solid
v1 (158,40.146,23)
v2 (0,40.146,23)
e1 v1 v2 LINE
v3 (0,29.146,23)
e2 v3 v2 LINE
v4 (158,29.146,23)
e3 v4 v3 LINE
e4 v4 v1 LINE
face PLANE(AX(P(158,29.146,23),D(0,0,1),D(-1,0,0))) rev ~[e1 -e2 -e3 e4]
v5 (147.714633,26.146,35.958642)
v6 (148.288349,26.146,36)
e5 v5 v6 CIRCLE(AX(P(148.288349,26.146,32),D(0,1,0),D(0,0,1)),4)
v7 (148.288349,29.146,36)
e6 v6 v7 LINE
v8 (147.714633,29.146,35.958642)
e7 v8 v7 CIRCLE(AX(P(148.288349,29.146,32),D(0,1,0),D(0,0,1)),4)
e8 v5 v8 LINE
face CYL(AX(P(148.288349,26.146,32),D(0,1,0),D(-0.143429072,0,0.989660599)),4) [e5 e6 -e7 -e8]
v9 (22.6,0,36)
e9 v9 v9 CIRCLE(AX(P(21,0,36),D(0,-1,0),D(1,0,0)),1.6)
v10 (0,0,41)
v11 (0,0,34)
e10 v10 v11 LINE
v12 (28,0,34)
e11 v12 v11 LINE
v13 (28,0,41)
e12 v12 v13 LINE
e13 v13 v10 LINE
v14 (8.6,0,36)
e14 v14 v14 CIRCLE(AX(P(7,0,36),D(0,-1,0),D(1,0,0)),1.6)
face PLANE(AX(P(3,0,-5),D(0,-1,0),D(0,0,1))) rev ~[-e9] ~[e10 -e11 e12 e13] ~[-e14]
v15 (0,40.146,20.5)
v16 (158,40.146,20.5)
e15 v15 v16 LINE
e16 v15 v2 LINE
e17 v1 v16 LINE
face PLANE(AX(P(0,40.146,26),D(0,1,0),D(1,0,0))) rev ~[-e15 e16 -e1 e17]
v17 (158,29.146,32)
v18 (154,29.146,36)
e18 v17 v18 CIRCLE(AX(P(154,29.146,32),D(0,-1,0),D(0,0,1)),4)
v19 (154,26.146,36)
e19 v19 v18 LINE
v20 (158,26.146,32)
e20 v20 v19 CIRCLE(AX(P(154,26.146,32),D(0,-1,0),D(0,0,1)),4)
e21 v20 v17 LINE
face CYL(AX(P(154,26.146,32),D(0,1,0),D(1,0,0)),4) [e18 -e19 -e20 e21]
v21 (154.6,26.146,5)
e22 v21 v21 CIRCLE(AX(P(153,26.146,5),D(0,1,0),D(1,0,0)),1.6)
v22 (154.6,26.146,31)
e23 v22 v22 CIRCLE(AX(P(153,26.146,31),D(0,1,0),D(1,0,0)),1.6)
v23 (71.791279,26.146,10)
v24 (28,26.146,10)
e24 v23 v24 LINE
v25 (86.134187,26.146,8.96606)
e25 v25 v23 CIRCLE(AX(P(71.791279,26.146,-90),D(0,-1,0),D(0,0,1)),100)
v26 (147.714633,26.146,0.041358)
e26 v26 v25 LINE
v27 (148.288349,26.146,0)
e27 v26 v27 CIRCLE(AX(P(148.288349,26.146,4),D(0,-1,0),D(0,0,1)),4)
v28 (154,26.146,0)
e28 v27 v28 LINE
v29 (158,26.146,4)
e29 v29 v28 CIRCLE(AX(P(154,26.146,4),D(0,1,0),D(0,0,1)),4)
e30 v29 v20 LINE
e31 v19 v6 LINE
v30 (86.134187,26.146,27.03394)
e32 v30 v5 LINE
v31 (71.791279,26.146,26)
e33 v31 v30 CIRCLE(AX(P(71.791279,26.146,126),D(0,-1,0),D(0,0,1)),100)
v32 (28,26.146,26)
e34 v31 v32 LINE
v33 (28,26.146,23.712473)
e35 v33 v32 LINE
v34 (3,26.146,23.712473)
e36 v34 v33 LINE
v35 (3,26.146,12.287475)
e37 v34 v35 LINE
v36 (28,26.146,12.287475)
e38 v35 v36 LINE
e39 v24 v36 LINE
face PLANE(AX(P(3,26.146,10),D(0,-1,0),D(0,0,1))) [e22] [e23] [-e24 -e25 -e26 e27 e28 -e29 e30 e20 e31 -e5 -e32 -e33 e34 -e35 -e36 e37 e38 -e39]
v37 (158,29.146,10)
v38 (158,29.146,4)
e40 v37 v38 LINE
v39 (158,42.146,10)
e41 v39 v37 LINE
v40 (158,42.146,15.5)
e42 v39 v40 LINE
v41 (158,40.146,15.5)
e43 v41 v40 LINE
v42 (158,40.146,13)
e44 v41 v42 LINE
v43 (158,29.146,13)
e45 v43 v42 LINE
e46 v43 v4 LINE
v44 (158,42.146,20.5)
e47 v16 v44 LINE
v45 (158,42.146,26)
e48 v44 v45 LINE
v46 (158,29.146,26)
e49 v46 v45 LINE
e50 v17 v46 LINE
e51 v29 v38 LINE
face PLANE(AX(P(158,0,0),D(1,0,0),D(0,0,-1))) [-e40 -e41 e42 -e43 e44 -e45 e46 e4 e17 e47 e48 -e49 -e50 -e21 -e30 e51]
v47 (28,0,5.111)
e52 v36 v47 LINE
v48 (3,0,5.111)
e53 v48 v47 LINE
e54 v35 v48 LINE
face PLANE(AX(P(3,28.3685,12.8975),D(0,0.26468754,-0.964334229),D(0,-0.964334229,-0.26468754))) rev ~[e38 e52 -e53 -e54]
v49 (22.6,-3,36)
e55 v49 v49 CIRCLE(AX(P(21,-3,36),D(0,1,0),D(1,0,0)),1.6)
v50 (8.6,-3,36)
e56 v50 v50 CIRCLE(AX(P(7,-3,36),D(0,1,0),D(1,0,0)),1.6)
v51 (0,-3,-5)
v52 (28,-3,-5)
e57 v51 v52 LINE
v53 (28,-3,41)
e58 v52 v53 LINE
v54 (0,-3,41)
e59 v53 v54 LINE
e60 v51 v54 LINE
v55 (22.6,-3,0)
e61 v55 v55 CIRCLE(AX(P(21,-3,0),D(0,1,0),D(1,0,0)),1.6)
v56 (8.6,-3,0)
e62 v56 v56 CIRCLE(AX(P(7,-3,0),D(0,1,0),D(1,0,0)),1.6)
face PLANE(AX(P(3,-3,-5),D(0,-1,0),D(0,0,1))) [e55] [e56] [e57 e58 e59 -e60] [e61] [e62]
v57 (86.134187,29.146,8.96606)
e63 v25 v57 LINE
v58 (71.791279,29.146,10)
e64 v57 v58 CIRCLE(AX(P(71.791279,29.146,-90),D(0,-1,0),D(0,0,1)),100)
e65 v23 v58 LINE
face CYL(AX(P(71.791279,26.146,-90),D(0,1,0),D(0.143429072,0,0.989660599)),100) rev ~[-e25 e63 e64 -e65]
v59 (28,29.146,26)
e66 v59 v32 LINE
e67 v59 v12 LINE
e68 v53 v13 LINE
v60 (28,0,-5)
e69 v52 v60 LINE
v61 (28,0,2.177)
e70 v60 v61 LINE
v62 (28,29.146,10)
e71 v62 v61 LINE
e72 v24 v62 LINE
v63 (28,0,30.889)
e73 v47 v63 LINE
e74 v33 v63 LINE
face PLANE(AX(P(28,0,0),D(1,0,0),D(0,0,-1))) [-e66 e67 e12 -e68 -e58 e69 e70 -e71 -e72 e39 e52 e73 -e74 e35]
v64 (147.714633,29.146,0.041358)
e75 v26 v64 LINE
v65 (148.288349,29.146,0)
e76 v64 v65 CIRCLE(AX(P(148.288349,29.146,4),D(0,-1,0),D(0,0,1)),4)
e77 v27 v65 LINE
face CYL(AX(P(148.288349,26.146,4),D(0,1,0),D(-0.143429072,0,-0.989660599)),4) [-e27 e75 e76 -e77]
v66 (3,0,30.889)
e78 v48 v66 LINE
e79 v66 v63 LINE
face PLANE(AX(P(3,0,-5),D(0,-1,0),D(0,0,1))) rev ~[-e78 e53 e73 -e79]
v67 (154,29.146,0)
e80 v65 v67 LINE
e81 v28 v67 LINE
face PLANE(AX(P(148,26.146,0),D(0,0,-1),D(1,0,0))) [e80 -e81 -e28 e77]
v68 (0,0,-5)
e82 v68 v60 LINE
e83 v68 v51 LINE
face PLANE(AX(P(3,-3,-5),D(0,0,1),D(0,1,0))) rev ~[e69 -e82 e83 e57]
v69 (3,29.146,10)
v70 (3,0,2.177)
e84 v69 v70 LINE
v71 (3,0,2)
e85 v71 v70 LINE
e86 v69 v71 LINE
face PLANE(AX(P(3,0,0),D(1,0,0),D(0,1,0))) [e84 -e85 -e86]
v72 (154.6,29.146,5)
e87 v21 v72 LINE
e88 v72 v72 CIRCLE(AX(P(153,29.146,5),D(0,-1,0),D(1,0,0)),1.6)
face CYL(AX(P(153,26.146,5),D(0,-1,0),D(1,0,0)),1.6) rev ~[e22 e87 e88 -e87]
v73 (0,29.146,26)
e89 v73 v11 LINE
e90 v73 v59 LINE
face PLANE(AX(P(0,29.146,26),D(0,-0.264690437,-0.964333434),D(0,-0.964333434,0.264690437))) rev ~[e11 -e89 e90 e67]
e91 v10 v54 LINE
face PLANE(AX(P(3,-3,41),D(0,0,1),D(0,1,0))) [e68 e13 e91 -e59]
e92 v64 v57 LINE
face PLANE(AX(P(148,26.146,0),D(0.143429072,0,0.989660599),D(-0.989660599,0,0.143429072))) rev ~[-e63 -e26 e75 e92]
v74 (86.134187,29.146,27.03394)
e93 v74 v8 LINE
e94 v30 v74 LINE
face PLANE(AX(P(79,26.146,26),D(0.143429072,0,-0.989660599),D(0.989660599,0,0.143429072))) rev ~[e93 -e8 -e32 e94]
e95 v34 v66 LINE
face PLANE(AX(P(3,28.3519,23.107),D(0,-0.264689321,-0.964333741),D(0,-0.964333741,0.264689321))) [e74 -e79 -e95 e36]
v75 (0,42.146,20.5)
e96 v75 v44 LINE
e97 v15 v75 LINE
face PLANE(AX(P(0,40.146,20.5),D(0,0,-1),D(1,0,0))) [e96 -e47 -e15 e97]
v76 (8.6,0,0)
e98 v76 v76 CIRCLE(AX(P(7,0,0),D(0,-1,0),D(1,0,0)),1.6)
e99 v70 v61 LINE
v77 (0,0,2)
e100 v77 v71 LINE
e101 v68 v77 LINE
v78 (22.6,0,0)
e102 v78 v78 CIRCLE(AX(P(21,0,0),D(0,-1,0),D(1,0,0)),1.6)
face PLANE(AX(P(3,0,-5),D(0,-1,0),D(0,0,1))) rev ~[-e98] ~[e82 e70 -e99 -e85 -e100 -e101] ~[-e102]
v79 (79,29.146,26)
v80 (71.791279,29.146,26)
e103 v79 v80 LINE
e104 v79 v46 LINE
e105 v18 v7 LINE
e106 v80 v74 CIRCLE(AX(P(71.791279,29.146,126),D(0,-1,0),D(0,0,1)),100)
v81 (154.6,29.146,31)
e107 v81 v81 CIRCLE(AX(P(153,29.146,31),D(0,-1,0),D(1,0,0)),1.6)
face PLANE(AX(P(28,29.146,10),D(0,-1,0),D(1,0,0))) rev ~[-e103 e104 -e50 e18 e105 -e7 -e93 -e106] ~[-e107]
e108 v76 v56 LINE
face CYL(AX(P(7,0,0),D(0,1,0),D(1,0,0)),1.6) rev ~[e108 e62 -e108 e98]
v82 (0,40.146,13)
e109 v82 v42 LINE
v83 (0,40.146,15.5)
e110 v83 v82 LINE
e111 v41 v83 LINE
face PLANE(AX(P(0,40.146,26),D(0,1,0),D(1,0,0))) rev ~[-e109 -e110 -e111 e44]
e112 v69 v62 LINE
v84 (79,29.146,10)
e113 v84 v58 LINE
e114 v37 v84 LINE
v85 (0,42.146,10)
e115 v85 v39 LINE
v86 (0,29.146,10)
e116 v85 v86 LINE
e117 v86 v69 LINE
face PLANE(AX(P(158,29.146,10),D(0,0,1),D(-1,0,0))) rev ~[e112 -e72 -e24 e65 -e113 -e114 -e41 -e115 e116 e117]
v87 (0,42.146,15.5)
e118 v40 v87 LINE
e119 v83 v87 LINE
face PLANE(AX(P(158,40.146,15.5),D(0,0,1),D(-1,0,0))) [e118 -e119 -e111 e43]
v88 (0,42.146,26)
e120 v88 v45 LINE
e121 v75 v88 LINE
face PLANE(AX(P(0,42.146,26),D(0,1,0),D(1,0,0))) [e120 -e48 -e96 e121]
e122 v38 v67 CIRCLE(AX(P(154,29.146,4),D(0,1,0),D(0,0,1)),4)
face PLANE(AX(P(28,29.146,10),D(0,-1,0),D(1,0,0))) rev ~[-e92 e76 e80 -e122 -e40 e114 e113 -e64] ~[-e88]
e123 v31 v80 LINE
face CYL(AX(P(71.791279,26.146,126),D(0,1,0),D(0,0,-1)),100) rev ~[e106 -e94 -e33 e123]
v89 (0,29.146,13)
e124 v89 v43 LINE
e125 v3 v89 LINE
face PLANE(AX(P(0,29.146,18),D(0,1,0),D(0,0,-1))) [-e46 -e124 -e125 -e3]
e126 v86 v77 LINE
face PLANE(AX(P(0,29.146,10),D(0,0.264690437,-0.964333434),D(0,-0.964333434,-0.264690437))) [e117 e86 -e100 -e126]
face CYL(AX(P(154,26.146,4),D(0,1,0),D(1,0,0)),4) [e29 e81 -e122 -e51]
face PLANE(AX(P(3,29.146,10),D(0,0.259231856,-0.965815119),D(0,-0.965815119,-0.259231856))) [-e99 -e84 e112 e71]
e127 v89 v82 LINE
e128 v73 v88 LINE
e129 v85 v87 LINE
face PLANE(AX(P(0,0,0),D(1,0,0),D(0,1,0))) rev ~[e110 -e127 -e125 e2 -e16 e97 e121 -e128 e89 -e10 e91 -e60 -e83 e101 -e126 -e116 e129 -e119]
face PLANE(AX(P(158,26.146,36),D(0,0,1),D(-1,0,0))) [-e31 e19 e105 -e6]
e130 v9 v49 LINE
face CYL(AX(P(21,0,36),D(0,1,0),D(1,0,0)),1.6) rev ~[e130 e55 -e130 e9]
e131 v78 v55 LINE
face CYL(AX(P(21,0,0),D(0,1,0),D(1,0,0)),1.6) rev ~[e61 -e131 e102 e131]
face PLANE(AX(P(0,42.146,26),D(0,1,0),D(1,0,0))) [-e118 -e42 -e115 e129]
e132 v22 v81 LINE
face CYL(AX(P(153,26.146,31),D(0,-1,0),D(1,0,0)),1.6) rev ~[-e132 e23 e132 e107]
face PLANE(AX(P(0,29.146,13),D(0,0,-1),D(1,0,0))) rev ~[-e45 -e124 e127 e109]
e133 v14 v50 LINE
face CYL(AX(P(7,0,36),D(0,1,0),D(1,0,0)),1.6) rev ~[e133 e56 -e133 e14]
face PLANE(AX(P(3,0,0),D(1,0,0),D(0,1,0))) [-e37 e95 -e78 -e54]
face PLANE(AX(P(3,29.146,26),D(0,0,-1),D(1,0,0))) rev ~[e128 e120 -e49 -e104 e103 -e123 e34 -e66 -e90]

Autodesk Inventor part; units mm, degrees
ref_plane "YZ Plane" through (0, 0, 0) normal (1, 0, 0) x (0, 1, 0)
ref_plane "XZ Plane" through (0, 0, 0) normal (0, 1, 0) x (-1, 0, 0)
ref_plane "XY Plane" through (0, 0, 0) normal (0, 0, 1) x (1, 0, 0)
sketch "Эскиз2" plane through (0, 0, 0) normal (1, 0, 0) x (0, 1, 0)
  line L0 (0, 0) -> (-3, 0)
  line L1 (-3, 0) -> (-3, 36)
  line L2 (-3, 36) -> (0, 36)
  line L3 (0, 36) -> (0, 0)
  line L4 (-3, 0) -> (0, 0)
  line L5 (0, 0) -> (0, -5)
  line L6 (0, -5) -> (-3, -5)
  line L7 (-3, -5) -> (-3, 0)
  line L8 (-3, 36) -> (0, 36)
  line L9 (0, 36) -> (0, 41)
  line L10 (0, 41) -> (-3, 41)
  line L11 (-3, 41) -> (-3, 36)
  line L12 (0, 0) -> (0, 36)
  line L13 (0, 36) -> (0, 34)
  line L14 (0, 0) -> (0, 2)
  line L15 (29.146, 18) -> (29.146, 26)
  line L16 (29.146, 26) -> (29.146, 10)
  line L17 (29.146, 10) -> (0, 2)
  line L18 (29.146, 26) -> (0, 34)
  point P0 (19.146, 0)
  dimension "d4" = 3
  dimension "d5" = 36
  dimension "d6" = 5
  dimension "d7" = 5
  dimension "d8" = 19.146
  dimension "d13" = 2
  dimension "d14" = 2
extrude "Выдавливание2" add sketch "Эскиз2" along normal blind 3
sketch "Эскиз3" plane through (3, 0, 0) normal (1, 0, 0) x (0, 0, -1)
  line L0 (5, -3) -> (5, 0) projected
  line L1 (5, 0) -> (-41, 0) projected
  line L2 (5, -3) -> (-41, -3)
  line L3 (-41, -3) -> (-41, 0)
  line L4 (-41, 0) -> (5, 0)
  line L5 (5, 0) -> (5, -3)
  point P0 (0, 0)
  point P1 (-34, 0)
extrude "Выдавливание3" add sketch "Эскиз3" along normal blind 25
sketch "Эскиз5" plane through (0, 0, 2) normal (0, 1, 0) x (1, 0, 0)
  line L0 (0, 7) -> (28, 7) projected
  line L1 (0, 7) -> (0, 2)
  line L2 (0, 7) -> (0, 0) projected
  line L3 (0, 2) -> (28, 2)
  line L4 (28, -39) -> (28, 7) projected
  line L5 (0, 7) -> (0, -39) projected
  line L6 (0, -39) -> (0, -34)
  line L7 (0, -34) -> (28, -34)
  line L8 (28, -34) -> (21, -34)
  line L9 (21, -34) -> (7, -34)
  line L10 (7, -34) -> (7, 2)
  circle A0 centre (7, -34) radius 1.6
  circle A1 centre (21, -34) radius 1.6
  circle A2 centre (7, 2) radius 1.6
  circle A3 centre (21, 2) radius 1.6
  point P0 (0, -32)
  dimension "d17" = 5
  dimension "d18" = 7
  dimension "d19" = 14
  dimension "d20" = 3.2
  dimension "d21" = 3.2
  dimension "d22" = 3.2
  dimension "d23" = 3.2
extrude "Выдавливание4" cut sketch "Эскиз5" against normal blind 25 contours A2 L3 | L3 L10 A2 | A3 L3 | L3 A3 | L3 A2 L10 | A1 L7 | L7 A1 | A0 L10 L7 | L7 A0 | A0 L7 L10
sketch "Эскиз7" plane through (3, 0, 0) normal (1, 0, 0) x (0, 0, -1)
  line L0 (-10, 29.146) -> (-26, 29.146) projected
  line L1 (-26, 29.146) -> (-10, 29.146)
  line L2 (-10, 29.146) -> (-10, 26.146)
  line L3 (-10, 26.146) -> (-26, 26.146)
  line L4 (-26, 26.146) -> (-26, 29.146)
  point P0 (0, 0)
  dimension "d37" = 3
extrude "Выдавливание6" add sketch "Эскиз7" along normal blind 155 and the other way blind 3
sketch "Эскиз8" plane through (0, 29.146, 26) normal (0, 1, 0) x (1, 0, 0)
  line L0 (158, 16) -> (158, 0) projected
  line L1 (0, -15) -> (0, 31) projected
  line L2 (158, 16) -> (0, 16)
  line L3 (0, 16) -> (0, 13)
  line L4 (0, 13) -> (158, 13)
  line L5 (158, 13) -> (158, 16)
  line L6 (0, 0) -> (3, 0) projected
  line L7 (0, 0) -> (158, 0)
  line L8 (158, 0) -> (158, 3)
  line L9 (158, 3) -> (0, 3)
  line L10 (0, 3) -> (0, 0)
  point P0 (0, 26)
  point P1 (158, 3)
  point P2 (0, 3)
  dimension "d38" = 3
  dimension "d39" = 3
extrude "Выдавливание7" add sketch "Эскиз8" along normal blind 11 contours L0 L4 L1 L2 | L0 L7 L6 L1 L9
sketch "Эскиз9" plane through (3, 0, 0) normal (1, 0, 0) x (0, 0, -1)
  line L0 (-26, 29.146) -> (-34, 0) projected
  line L1 (-34, 0) -> (-26, 29.146)
  line L2 (-26, 29.146) -> (-10, 29.146)
  line L3 (-10, 29.146) -> (-2.177, 0)
  line L4 (-2.177, 0) -> (-34, 0)
  line L5 (-1.6, 0) -> (1.6, 0) projected
  line L6 (-26, 29.146) -> (-23.107, 28.3519)
  line L7 (-23.107, 28.3519) -> (-30.889, 0)
  line L8 (-2, 0) -> (-10, 29.146) projected
  line L9 (-2, 0) -> (-5.111, 0)
  line L10 (-34, 0) -> (-2, 0) projected
  line L11 (-10, 29.146) -> (-12.8975, 28.3685)
  line L12 (-10, 29.146) -> (-7, 29.146) construction
  line L13 (-12.8975, 28.3685) -> (-5.111, 0)
  point P0 (0, 0)
  dimension "d42" = 3
  dimension "d43" = 3.111
  dimension "d44" = 3
  dimension "d45" = 164.98
extrude "Выдавливание8" add sketch "Эскиз9" along normal blind 25 contours L6 L7 L4 L0 | L3 L4 L13 L11
sketch "Эскиз10" plane through (0, 40.146, 26) normal (0, 1, 0) x (1, 0, 0)
  line L0 (0, 0) -> (0, -8) projected
  line L1 (158, 16) -> (28, 16) projected
  line L2 (0, 0) -> (158, 0)
  line L3 (158, 0) -> (158, 16)
  line L4 (158, 16) -> (0, 16)
  line L5 (0, 16) -> (0, 0)
  line L6 (0, -15) -> (0, 31) projected
  line L7 (0, 8) -> (0, 10.5)
  line L8 (0, 10.5) -> (0, 5.5)
  line L9 (0, 5.5) -> (158, 5.5)
  line L10 (158, 13) -> (158, 3) projected
  line L11 (158, 5.5) -> (158, 10.5)
  line L12 (158, 10.5) -> (0, 10.5)
  line L13 (0, 13) -> (158, 13) projected
  point P0 (0, 26)
  point P1 (28, 16)
  dimension "d48" = 2.5
  dimension "d49" = 5
extrude "Выдавливание9" add sketch "Эскиз10" along normal blind 2 contours L3 L13 L5 L4 L1 | L3 L12 L5 L13 | L3 L2 L5 L9
sketch "Эскиз11" plane through (28, 26.146, 10) normal (0, -1, 0) x (1, 0, 0)
  line L0 (130, 0) -> (-28, 0) projected
  line L1 (130, 0) -> (130, -10)
  line L2 (125, -5) -> (125, 21)
  line L3 (130, 16) -> (130, 10.5) projected
  line L4 (130, 21) -> (130, 16)
  line L5 (130, 16) -> (130, 21)
  line L6 (130, 21) -> (130, 26)
  line L7 (130, 26) -> (120, 26)
  line L8 (120, 26) -> (120, -10)
  line L9 (120, -10) -> (130, -10)
  line L10 (-28, 16) -> (130, 16) projected
  line L11 (51, 16) -> (120, 26)
  line L12 (120, -10) -> (51, 0)
  circle A0 centre (125, 21) radius 1.6
  circle A1 centre (125, -5) radius 1.6
  point P0 (-28, -10)
  dimension "d52" = 10
  dimension "d54" = 26
  dimension "d56" = 10
  dimension "d57" = 3.2
  dimension "d58" = 3.2
extrude "Выдавливание10" add sketch "Эскиз11" against normal blind 3 contours L1 L9 L8 L0 | L8 L12 L0 | L10 L8 L7 L6 L4 | L10 L11 L8
fillet "Сопряжение1" radius 4 4 edges at (158, 27.646, 36) (158, 27.646, 0) (148, 27.646, 0) (148, 27.646, 36)
fillet "Сопряжение2" radius 100 2 edges at (79, 27.646, 10) (79, 27.646, 26)
properties part number "reyka"
